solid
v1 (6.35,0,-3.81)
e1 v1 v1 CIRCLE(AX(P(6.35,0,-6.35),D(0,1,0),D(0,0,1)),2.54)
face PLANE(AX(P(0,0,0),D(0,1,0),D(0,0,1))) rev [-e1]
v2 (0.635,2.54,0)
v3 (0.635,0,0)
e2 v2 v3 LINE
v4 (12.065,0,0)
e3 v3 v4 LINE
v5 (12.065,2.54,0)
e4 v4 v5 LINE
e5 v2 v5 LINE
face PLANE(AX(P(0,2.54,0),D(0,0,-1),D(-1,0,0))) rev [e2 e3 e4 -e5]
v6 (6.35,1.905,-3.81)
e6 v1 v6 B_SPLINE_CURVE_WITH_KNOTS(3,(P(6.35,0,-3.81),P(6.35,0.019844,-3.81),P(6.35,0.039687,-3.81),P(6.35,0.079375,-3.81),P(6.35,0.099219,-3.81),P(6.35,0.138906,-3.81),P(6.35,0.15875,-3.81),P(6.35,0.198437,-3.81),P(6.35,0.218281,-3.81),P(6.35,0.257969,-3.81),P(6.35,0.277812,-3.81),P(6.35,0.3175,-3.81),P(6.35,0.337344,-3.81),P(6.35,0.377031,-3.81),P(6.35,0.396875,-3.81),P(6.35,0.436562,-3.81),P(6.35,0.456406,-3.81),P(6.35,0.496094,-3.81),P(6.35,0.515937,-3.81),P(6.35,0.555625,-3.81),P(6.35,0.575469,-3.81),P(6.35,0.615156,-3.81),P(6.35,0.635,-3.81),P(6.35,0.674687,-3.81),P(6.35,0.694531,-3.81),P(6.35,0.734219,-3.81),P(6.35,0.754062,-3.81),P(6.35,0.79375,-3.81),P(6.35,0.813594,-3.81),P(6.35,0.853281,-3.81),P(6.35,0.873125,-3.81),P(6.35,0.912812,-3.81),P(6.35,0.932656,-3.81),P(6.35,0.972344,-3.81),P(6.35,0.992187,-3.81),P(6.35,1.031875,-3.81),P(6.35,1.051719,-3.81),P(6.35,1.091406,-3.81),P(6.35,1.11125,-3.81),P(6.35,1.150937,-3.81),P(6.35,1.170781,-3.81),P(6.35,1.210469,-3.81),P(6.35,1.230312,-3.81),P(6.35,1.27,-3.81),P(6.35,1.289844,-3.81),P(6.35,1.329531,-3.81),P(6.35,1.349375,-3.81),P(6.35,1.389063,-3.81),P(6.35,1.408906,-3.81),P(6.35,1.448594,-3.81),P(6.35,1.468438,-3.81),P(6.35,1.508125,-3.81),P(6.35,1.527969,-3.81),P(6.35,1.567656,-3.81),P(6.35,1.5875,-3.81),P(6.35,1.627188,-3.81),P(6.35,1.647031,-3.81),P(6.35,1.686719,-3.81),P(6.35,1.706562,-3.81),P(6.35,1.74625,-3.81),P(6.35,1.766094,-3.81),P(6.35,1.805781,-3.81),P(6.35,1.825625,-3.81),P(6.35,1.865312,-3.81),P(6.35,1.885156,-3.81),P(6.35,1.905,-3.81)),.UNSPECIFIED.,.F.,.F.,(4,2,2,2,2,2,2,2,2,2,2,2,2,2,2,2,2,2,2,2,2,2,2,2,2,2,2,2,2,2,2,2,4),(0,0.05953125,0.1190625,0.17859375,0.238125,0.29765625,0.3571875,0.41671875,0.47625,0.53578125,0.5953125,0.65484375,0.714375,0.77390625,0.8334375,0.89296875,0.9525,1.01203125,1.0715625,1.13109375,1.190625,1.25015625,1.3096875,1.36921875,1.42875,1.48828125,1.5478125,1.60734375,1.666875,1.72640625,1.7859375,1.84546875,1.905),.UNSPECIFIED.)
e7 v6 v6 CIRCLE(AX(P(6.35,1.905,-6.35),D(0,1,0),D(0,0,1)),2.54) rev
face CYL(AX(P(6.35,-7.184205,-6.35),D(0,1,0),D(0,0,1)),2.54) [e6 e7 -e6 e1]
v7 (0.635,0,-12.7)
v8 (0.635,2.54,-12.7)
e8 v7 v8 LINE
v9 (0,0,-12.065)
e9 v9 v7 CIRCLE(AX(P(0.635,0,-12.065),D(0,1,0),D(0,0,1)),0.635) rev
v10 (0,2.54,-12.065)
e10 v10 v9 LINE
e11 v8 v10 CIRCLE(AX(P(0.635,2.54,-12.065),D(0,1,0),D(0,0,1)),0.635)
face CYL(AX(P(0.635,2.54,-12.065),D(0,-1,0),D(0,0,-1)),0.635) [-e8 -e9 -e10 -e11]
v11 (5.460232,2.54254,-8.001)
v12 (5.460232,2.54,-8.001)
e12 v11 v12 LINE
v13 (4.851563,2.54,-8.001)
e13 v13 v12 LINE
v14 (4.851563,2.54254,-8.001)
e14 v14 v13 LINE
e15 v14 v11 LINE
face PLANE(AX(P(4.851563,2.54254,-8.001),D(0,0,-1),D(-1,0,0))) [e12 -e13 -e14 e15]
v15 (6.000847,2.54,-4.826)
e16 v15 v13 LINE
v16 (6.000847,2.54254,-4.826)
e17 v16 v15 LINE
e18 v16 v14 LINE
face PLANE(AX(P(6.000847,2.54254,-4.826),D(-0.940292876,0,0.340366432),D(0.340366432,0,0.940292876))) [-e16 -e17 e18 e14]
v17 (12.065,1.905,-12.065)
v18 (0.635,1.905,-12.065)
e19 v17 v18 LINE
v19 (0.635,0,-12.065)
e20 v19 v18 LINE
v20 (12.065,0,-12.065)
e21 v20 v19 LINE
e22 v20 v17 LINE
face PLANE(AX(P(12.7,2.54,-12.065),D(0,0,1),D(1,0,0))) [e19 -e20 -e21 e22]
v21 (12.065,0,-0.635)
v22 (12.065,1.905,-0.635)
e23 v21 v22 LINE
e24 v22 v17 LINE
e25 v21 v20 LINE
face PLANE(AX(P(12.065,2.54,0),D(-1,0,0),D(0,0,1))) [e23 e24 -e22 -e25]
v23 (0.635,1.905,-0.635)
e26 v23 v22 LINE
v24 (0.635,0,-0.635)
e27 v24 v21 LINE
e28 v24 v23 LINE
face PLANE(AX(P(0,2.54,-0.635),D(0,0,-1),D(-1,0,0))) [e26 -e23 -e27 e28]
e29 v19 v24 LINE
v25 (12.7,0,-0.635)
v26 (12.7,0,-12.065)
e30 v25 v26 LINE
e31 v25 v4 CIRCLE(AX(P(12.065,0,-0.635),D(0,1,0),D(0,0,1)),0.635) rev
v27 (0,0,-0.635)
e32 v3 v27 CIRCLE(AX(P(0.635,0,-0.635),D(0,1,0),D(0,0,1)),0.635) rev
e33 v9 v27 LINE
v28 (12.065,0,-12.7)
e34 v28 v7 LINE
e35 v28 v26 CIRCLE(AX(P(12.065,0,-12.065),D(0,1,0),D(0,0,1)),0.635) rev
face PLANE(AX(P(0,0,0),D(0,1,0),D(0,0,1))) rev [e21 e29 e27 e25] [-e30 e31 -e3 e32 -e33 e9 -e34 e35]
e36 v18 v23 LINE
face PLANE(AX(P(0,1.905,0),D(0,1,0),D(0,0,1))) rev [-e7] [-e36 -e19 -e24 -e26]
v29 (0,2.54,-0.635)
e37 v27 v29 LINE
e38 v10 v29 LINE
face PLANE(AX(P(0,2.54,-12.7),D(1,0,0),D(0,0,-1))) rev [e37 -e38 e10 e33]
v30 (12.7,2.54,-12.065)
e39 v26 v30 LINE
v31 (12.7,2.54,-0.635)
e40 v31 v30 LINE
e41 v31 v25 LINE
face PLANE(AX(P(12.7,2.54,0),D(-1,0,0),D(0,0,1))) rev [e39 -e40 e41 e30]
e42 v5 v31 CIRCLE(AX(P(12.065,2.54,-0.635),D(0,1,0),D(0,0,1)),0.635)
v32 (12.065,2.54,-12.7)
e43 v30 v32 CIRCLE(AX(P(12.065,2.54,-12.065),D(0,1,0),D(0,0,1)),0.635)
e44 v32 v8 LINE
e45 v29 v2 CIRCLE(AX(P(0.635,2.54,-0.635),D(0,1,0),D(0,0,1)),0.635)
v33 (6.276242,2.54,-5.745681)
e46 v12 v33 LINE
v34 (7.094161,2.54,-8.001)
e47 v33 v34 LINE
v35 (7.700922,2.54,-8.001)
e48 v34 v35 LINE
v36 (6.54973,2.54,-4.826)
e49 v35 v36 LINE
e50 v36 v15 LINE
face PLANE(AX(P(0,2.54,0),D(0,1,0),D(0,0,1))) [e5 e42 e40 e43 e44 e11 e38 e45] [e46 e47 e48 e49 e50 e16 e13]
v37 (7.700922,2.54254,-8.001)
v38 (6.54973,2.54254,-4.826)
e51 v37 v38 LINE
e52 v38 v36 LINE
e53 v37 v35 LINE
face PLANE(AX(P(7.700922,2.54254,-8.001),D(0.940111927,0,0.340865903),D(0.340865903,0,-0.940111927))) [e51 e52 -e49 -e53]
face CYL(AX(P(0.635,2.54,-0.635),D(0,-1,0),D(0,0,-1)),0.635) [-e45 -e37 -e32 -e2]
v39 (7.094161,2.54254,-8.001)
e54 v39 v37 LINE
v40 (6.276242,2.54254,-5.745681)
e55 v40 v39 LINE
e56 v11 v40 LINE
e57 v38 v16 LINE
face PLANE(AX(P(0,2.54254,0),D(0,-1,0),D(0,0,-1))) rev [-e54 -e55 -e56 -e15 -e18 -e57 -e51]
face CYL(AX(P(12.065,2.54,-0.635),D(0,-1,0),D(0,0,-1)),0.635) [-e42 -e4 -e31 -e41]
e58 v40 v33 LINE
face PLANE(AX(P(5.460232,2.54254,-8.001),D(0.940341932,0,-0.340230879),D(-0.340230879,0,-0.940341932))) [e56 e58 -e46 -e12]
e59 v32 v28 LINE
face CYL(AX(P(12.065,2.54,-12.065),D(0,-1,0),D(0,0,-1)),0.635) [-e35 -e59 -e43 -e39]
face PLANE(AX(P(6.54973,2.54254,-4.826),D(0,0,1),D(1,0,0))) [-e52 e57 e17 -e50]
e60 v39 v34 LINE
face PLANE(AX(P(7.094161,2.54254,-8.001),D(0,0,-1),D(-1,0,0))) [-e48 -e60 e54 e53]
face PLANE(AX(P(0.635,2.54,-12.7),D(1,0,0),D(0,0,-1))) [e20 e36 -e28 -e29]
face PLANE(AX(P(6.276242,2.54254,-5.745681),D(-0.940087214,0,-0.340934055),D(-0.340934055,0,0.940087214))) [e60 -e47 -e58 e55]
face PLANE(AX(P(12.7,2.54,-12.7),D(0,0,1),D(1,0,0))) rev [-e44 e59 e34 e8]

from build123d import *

# Parameters (mm, degrees)
SKETCH1_W           = 12.7
SKETCH1_H           = 12.7
BOSS_EXTRUDE1_DEPTH = 2.54
FILLET1_R           = 0.635
SHELL1_START        = 0.635
SHELL1_OUTLINE_W    = 1.905
SHELL1_OUTLINE_H    = 11.43
SHELL1_DEPTH        = 11.43
SKETCH2_R           = 2.54
BOSS_EXTRUDE2_DEPTH = 1.905
BOSS_EXTRUDE3_DEPTH = 0.00254


# Read off the part's stored shape, not the designer's step: Shell1
with BuildPart() as part:
    # Sketch1 → Boss-Extrude1 (new body)
    with BuildSketch(Plane(origin=(0, 0, 0), x_dir=(1, 0, 0), z_dir=(0, 1, 0))):
        with Locations((6.35, 6.35)):
            Rectangle(SKETCH1_W, SKETCH1_H)
    extrude(amount=BOSS_EXTRUDE1_DEPTH)

    # Fillet1
    fillet1_edges = [part.edges().sort_by_distance(p)[0] for p in [
        (0, 1.27, -12.7),
        (12.7, 1.27, -12.7),
        (12.7, 1.27, 0),
        (0, 1.27, 0),
    ]]
    fillet(fillet1_edges, radius=FILLET1_R)

    # Shell1 outline → Shell1 (cut)
    with BuildSketch(Plane.YZ.offset(SHELL1_START)):
        with Locations((0.9525, -6.35)):
            Rectangle(SHELL1_OUTLINE_W, SHELL1_OUTLINE_H)
    extrude(amount=SHELL1_DEPTH, mode=Mode.SUBTRACT)

    # Sketch2 → Boss-Extrude2 (add)
    with BuildSketch(Plane(origin=(0, 1.905, 0), x_dir=(-1, 0, 0), z_dir=(0, -1, 0))):
        with Locations(Location((-6.35, 6.35, 0), (0, 0, 270))):
            Circle(SKETCH2_R)
    extrude(amount=BOSS_EXTRUDE2_DEPTH)

    # Sketch3 → Boss-Extrude3 (add)
    with BuildSketch(Plane(origin=(0, 2.54, 0), x_dir=(1, 0, 0), z_dir=(0, 1, 0))):
        Polygon((4.851562821, 8.001), (5.460231691, 8.001), (6.276242308, 5.74568149), (7.094160978, 8.001), (7.700921795, 8.001), (6.549729888, 4.826), (6.000846675, 4.826), align=None)
    extrude(amount=BOSS_EXTRUDE3_DEPTH)


solid = part.part
